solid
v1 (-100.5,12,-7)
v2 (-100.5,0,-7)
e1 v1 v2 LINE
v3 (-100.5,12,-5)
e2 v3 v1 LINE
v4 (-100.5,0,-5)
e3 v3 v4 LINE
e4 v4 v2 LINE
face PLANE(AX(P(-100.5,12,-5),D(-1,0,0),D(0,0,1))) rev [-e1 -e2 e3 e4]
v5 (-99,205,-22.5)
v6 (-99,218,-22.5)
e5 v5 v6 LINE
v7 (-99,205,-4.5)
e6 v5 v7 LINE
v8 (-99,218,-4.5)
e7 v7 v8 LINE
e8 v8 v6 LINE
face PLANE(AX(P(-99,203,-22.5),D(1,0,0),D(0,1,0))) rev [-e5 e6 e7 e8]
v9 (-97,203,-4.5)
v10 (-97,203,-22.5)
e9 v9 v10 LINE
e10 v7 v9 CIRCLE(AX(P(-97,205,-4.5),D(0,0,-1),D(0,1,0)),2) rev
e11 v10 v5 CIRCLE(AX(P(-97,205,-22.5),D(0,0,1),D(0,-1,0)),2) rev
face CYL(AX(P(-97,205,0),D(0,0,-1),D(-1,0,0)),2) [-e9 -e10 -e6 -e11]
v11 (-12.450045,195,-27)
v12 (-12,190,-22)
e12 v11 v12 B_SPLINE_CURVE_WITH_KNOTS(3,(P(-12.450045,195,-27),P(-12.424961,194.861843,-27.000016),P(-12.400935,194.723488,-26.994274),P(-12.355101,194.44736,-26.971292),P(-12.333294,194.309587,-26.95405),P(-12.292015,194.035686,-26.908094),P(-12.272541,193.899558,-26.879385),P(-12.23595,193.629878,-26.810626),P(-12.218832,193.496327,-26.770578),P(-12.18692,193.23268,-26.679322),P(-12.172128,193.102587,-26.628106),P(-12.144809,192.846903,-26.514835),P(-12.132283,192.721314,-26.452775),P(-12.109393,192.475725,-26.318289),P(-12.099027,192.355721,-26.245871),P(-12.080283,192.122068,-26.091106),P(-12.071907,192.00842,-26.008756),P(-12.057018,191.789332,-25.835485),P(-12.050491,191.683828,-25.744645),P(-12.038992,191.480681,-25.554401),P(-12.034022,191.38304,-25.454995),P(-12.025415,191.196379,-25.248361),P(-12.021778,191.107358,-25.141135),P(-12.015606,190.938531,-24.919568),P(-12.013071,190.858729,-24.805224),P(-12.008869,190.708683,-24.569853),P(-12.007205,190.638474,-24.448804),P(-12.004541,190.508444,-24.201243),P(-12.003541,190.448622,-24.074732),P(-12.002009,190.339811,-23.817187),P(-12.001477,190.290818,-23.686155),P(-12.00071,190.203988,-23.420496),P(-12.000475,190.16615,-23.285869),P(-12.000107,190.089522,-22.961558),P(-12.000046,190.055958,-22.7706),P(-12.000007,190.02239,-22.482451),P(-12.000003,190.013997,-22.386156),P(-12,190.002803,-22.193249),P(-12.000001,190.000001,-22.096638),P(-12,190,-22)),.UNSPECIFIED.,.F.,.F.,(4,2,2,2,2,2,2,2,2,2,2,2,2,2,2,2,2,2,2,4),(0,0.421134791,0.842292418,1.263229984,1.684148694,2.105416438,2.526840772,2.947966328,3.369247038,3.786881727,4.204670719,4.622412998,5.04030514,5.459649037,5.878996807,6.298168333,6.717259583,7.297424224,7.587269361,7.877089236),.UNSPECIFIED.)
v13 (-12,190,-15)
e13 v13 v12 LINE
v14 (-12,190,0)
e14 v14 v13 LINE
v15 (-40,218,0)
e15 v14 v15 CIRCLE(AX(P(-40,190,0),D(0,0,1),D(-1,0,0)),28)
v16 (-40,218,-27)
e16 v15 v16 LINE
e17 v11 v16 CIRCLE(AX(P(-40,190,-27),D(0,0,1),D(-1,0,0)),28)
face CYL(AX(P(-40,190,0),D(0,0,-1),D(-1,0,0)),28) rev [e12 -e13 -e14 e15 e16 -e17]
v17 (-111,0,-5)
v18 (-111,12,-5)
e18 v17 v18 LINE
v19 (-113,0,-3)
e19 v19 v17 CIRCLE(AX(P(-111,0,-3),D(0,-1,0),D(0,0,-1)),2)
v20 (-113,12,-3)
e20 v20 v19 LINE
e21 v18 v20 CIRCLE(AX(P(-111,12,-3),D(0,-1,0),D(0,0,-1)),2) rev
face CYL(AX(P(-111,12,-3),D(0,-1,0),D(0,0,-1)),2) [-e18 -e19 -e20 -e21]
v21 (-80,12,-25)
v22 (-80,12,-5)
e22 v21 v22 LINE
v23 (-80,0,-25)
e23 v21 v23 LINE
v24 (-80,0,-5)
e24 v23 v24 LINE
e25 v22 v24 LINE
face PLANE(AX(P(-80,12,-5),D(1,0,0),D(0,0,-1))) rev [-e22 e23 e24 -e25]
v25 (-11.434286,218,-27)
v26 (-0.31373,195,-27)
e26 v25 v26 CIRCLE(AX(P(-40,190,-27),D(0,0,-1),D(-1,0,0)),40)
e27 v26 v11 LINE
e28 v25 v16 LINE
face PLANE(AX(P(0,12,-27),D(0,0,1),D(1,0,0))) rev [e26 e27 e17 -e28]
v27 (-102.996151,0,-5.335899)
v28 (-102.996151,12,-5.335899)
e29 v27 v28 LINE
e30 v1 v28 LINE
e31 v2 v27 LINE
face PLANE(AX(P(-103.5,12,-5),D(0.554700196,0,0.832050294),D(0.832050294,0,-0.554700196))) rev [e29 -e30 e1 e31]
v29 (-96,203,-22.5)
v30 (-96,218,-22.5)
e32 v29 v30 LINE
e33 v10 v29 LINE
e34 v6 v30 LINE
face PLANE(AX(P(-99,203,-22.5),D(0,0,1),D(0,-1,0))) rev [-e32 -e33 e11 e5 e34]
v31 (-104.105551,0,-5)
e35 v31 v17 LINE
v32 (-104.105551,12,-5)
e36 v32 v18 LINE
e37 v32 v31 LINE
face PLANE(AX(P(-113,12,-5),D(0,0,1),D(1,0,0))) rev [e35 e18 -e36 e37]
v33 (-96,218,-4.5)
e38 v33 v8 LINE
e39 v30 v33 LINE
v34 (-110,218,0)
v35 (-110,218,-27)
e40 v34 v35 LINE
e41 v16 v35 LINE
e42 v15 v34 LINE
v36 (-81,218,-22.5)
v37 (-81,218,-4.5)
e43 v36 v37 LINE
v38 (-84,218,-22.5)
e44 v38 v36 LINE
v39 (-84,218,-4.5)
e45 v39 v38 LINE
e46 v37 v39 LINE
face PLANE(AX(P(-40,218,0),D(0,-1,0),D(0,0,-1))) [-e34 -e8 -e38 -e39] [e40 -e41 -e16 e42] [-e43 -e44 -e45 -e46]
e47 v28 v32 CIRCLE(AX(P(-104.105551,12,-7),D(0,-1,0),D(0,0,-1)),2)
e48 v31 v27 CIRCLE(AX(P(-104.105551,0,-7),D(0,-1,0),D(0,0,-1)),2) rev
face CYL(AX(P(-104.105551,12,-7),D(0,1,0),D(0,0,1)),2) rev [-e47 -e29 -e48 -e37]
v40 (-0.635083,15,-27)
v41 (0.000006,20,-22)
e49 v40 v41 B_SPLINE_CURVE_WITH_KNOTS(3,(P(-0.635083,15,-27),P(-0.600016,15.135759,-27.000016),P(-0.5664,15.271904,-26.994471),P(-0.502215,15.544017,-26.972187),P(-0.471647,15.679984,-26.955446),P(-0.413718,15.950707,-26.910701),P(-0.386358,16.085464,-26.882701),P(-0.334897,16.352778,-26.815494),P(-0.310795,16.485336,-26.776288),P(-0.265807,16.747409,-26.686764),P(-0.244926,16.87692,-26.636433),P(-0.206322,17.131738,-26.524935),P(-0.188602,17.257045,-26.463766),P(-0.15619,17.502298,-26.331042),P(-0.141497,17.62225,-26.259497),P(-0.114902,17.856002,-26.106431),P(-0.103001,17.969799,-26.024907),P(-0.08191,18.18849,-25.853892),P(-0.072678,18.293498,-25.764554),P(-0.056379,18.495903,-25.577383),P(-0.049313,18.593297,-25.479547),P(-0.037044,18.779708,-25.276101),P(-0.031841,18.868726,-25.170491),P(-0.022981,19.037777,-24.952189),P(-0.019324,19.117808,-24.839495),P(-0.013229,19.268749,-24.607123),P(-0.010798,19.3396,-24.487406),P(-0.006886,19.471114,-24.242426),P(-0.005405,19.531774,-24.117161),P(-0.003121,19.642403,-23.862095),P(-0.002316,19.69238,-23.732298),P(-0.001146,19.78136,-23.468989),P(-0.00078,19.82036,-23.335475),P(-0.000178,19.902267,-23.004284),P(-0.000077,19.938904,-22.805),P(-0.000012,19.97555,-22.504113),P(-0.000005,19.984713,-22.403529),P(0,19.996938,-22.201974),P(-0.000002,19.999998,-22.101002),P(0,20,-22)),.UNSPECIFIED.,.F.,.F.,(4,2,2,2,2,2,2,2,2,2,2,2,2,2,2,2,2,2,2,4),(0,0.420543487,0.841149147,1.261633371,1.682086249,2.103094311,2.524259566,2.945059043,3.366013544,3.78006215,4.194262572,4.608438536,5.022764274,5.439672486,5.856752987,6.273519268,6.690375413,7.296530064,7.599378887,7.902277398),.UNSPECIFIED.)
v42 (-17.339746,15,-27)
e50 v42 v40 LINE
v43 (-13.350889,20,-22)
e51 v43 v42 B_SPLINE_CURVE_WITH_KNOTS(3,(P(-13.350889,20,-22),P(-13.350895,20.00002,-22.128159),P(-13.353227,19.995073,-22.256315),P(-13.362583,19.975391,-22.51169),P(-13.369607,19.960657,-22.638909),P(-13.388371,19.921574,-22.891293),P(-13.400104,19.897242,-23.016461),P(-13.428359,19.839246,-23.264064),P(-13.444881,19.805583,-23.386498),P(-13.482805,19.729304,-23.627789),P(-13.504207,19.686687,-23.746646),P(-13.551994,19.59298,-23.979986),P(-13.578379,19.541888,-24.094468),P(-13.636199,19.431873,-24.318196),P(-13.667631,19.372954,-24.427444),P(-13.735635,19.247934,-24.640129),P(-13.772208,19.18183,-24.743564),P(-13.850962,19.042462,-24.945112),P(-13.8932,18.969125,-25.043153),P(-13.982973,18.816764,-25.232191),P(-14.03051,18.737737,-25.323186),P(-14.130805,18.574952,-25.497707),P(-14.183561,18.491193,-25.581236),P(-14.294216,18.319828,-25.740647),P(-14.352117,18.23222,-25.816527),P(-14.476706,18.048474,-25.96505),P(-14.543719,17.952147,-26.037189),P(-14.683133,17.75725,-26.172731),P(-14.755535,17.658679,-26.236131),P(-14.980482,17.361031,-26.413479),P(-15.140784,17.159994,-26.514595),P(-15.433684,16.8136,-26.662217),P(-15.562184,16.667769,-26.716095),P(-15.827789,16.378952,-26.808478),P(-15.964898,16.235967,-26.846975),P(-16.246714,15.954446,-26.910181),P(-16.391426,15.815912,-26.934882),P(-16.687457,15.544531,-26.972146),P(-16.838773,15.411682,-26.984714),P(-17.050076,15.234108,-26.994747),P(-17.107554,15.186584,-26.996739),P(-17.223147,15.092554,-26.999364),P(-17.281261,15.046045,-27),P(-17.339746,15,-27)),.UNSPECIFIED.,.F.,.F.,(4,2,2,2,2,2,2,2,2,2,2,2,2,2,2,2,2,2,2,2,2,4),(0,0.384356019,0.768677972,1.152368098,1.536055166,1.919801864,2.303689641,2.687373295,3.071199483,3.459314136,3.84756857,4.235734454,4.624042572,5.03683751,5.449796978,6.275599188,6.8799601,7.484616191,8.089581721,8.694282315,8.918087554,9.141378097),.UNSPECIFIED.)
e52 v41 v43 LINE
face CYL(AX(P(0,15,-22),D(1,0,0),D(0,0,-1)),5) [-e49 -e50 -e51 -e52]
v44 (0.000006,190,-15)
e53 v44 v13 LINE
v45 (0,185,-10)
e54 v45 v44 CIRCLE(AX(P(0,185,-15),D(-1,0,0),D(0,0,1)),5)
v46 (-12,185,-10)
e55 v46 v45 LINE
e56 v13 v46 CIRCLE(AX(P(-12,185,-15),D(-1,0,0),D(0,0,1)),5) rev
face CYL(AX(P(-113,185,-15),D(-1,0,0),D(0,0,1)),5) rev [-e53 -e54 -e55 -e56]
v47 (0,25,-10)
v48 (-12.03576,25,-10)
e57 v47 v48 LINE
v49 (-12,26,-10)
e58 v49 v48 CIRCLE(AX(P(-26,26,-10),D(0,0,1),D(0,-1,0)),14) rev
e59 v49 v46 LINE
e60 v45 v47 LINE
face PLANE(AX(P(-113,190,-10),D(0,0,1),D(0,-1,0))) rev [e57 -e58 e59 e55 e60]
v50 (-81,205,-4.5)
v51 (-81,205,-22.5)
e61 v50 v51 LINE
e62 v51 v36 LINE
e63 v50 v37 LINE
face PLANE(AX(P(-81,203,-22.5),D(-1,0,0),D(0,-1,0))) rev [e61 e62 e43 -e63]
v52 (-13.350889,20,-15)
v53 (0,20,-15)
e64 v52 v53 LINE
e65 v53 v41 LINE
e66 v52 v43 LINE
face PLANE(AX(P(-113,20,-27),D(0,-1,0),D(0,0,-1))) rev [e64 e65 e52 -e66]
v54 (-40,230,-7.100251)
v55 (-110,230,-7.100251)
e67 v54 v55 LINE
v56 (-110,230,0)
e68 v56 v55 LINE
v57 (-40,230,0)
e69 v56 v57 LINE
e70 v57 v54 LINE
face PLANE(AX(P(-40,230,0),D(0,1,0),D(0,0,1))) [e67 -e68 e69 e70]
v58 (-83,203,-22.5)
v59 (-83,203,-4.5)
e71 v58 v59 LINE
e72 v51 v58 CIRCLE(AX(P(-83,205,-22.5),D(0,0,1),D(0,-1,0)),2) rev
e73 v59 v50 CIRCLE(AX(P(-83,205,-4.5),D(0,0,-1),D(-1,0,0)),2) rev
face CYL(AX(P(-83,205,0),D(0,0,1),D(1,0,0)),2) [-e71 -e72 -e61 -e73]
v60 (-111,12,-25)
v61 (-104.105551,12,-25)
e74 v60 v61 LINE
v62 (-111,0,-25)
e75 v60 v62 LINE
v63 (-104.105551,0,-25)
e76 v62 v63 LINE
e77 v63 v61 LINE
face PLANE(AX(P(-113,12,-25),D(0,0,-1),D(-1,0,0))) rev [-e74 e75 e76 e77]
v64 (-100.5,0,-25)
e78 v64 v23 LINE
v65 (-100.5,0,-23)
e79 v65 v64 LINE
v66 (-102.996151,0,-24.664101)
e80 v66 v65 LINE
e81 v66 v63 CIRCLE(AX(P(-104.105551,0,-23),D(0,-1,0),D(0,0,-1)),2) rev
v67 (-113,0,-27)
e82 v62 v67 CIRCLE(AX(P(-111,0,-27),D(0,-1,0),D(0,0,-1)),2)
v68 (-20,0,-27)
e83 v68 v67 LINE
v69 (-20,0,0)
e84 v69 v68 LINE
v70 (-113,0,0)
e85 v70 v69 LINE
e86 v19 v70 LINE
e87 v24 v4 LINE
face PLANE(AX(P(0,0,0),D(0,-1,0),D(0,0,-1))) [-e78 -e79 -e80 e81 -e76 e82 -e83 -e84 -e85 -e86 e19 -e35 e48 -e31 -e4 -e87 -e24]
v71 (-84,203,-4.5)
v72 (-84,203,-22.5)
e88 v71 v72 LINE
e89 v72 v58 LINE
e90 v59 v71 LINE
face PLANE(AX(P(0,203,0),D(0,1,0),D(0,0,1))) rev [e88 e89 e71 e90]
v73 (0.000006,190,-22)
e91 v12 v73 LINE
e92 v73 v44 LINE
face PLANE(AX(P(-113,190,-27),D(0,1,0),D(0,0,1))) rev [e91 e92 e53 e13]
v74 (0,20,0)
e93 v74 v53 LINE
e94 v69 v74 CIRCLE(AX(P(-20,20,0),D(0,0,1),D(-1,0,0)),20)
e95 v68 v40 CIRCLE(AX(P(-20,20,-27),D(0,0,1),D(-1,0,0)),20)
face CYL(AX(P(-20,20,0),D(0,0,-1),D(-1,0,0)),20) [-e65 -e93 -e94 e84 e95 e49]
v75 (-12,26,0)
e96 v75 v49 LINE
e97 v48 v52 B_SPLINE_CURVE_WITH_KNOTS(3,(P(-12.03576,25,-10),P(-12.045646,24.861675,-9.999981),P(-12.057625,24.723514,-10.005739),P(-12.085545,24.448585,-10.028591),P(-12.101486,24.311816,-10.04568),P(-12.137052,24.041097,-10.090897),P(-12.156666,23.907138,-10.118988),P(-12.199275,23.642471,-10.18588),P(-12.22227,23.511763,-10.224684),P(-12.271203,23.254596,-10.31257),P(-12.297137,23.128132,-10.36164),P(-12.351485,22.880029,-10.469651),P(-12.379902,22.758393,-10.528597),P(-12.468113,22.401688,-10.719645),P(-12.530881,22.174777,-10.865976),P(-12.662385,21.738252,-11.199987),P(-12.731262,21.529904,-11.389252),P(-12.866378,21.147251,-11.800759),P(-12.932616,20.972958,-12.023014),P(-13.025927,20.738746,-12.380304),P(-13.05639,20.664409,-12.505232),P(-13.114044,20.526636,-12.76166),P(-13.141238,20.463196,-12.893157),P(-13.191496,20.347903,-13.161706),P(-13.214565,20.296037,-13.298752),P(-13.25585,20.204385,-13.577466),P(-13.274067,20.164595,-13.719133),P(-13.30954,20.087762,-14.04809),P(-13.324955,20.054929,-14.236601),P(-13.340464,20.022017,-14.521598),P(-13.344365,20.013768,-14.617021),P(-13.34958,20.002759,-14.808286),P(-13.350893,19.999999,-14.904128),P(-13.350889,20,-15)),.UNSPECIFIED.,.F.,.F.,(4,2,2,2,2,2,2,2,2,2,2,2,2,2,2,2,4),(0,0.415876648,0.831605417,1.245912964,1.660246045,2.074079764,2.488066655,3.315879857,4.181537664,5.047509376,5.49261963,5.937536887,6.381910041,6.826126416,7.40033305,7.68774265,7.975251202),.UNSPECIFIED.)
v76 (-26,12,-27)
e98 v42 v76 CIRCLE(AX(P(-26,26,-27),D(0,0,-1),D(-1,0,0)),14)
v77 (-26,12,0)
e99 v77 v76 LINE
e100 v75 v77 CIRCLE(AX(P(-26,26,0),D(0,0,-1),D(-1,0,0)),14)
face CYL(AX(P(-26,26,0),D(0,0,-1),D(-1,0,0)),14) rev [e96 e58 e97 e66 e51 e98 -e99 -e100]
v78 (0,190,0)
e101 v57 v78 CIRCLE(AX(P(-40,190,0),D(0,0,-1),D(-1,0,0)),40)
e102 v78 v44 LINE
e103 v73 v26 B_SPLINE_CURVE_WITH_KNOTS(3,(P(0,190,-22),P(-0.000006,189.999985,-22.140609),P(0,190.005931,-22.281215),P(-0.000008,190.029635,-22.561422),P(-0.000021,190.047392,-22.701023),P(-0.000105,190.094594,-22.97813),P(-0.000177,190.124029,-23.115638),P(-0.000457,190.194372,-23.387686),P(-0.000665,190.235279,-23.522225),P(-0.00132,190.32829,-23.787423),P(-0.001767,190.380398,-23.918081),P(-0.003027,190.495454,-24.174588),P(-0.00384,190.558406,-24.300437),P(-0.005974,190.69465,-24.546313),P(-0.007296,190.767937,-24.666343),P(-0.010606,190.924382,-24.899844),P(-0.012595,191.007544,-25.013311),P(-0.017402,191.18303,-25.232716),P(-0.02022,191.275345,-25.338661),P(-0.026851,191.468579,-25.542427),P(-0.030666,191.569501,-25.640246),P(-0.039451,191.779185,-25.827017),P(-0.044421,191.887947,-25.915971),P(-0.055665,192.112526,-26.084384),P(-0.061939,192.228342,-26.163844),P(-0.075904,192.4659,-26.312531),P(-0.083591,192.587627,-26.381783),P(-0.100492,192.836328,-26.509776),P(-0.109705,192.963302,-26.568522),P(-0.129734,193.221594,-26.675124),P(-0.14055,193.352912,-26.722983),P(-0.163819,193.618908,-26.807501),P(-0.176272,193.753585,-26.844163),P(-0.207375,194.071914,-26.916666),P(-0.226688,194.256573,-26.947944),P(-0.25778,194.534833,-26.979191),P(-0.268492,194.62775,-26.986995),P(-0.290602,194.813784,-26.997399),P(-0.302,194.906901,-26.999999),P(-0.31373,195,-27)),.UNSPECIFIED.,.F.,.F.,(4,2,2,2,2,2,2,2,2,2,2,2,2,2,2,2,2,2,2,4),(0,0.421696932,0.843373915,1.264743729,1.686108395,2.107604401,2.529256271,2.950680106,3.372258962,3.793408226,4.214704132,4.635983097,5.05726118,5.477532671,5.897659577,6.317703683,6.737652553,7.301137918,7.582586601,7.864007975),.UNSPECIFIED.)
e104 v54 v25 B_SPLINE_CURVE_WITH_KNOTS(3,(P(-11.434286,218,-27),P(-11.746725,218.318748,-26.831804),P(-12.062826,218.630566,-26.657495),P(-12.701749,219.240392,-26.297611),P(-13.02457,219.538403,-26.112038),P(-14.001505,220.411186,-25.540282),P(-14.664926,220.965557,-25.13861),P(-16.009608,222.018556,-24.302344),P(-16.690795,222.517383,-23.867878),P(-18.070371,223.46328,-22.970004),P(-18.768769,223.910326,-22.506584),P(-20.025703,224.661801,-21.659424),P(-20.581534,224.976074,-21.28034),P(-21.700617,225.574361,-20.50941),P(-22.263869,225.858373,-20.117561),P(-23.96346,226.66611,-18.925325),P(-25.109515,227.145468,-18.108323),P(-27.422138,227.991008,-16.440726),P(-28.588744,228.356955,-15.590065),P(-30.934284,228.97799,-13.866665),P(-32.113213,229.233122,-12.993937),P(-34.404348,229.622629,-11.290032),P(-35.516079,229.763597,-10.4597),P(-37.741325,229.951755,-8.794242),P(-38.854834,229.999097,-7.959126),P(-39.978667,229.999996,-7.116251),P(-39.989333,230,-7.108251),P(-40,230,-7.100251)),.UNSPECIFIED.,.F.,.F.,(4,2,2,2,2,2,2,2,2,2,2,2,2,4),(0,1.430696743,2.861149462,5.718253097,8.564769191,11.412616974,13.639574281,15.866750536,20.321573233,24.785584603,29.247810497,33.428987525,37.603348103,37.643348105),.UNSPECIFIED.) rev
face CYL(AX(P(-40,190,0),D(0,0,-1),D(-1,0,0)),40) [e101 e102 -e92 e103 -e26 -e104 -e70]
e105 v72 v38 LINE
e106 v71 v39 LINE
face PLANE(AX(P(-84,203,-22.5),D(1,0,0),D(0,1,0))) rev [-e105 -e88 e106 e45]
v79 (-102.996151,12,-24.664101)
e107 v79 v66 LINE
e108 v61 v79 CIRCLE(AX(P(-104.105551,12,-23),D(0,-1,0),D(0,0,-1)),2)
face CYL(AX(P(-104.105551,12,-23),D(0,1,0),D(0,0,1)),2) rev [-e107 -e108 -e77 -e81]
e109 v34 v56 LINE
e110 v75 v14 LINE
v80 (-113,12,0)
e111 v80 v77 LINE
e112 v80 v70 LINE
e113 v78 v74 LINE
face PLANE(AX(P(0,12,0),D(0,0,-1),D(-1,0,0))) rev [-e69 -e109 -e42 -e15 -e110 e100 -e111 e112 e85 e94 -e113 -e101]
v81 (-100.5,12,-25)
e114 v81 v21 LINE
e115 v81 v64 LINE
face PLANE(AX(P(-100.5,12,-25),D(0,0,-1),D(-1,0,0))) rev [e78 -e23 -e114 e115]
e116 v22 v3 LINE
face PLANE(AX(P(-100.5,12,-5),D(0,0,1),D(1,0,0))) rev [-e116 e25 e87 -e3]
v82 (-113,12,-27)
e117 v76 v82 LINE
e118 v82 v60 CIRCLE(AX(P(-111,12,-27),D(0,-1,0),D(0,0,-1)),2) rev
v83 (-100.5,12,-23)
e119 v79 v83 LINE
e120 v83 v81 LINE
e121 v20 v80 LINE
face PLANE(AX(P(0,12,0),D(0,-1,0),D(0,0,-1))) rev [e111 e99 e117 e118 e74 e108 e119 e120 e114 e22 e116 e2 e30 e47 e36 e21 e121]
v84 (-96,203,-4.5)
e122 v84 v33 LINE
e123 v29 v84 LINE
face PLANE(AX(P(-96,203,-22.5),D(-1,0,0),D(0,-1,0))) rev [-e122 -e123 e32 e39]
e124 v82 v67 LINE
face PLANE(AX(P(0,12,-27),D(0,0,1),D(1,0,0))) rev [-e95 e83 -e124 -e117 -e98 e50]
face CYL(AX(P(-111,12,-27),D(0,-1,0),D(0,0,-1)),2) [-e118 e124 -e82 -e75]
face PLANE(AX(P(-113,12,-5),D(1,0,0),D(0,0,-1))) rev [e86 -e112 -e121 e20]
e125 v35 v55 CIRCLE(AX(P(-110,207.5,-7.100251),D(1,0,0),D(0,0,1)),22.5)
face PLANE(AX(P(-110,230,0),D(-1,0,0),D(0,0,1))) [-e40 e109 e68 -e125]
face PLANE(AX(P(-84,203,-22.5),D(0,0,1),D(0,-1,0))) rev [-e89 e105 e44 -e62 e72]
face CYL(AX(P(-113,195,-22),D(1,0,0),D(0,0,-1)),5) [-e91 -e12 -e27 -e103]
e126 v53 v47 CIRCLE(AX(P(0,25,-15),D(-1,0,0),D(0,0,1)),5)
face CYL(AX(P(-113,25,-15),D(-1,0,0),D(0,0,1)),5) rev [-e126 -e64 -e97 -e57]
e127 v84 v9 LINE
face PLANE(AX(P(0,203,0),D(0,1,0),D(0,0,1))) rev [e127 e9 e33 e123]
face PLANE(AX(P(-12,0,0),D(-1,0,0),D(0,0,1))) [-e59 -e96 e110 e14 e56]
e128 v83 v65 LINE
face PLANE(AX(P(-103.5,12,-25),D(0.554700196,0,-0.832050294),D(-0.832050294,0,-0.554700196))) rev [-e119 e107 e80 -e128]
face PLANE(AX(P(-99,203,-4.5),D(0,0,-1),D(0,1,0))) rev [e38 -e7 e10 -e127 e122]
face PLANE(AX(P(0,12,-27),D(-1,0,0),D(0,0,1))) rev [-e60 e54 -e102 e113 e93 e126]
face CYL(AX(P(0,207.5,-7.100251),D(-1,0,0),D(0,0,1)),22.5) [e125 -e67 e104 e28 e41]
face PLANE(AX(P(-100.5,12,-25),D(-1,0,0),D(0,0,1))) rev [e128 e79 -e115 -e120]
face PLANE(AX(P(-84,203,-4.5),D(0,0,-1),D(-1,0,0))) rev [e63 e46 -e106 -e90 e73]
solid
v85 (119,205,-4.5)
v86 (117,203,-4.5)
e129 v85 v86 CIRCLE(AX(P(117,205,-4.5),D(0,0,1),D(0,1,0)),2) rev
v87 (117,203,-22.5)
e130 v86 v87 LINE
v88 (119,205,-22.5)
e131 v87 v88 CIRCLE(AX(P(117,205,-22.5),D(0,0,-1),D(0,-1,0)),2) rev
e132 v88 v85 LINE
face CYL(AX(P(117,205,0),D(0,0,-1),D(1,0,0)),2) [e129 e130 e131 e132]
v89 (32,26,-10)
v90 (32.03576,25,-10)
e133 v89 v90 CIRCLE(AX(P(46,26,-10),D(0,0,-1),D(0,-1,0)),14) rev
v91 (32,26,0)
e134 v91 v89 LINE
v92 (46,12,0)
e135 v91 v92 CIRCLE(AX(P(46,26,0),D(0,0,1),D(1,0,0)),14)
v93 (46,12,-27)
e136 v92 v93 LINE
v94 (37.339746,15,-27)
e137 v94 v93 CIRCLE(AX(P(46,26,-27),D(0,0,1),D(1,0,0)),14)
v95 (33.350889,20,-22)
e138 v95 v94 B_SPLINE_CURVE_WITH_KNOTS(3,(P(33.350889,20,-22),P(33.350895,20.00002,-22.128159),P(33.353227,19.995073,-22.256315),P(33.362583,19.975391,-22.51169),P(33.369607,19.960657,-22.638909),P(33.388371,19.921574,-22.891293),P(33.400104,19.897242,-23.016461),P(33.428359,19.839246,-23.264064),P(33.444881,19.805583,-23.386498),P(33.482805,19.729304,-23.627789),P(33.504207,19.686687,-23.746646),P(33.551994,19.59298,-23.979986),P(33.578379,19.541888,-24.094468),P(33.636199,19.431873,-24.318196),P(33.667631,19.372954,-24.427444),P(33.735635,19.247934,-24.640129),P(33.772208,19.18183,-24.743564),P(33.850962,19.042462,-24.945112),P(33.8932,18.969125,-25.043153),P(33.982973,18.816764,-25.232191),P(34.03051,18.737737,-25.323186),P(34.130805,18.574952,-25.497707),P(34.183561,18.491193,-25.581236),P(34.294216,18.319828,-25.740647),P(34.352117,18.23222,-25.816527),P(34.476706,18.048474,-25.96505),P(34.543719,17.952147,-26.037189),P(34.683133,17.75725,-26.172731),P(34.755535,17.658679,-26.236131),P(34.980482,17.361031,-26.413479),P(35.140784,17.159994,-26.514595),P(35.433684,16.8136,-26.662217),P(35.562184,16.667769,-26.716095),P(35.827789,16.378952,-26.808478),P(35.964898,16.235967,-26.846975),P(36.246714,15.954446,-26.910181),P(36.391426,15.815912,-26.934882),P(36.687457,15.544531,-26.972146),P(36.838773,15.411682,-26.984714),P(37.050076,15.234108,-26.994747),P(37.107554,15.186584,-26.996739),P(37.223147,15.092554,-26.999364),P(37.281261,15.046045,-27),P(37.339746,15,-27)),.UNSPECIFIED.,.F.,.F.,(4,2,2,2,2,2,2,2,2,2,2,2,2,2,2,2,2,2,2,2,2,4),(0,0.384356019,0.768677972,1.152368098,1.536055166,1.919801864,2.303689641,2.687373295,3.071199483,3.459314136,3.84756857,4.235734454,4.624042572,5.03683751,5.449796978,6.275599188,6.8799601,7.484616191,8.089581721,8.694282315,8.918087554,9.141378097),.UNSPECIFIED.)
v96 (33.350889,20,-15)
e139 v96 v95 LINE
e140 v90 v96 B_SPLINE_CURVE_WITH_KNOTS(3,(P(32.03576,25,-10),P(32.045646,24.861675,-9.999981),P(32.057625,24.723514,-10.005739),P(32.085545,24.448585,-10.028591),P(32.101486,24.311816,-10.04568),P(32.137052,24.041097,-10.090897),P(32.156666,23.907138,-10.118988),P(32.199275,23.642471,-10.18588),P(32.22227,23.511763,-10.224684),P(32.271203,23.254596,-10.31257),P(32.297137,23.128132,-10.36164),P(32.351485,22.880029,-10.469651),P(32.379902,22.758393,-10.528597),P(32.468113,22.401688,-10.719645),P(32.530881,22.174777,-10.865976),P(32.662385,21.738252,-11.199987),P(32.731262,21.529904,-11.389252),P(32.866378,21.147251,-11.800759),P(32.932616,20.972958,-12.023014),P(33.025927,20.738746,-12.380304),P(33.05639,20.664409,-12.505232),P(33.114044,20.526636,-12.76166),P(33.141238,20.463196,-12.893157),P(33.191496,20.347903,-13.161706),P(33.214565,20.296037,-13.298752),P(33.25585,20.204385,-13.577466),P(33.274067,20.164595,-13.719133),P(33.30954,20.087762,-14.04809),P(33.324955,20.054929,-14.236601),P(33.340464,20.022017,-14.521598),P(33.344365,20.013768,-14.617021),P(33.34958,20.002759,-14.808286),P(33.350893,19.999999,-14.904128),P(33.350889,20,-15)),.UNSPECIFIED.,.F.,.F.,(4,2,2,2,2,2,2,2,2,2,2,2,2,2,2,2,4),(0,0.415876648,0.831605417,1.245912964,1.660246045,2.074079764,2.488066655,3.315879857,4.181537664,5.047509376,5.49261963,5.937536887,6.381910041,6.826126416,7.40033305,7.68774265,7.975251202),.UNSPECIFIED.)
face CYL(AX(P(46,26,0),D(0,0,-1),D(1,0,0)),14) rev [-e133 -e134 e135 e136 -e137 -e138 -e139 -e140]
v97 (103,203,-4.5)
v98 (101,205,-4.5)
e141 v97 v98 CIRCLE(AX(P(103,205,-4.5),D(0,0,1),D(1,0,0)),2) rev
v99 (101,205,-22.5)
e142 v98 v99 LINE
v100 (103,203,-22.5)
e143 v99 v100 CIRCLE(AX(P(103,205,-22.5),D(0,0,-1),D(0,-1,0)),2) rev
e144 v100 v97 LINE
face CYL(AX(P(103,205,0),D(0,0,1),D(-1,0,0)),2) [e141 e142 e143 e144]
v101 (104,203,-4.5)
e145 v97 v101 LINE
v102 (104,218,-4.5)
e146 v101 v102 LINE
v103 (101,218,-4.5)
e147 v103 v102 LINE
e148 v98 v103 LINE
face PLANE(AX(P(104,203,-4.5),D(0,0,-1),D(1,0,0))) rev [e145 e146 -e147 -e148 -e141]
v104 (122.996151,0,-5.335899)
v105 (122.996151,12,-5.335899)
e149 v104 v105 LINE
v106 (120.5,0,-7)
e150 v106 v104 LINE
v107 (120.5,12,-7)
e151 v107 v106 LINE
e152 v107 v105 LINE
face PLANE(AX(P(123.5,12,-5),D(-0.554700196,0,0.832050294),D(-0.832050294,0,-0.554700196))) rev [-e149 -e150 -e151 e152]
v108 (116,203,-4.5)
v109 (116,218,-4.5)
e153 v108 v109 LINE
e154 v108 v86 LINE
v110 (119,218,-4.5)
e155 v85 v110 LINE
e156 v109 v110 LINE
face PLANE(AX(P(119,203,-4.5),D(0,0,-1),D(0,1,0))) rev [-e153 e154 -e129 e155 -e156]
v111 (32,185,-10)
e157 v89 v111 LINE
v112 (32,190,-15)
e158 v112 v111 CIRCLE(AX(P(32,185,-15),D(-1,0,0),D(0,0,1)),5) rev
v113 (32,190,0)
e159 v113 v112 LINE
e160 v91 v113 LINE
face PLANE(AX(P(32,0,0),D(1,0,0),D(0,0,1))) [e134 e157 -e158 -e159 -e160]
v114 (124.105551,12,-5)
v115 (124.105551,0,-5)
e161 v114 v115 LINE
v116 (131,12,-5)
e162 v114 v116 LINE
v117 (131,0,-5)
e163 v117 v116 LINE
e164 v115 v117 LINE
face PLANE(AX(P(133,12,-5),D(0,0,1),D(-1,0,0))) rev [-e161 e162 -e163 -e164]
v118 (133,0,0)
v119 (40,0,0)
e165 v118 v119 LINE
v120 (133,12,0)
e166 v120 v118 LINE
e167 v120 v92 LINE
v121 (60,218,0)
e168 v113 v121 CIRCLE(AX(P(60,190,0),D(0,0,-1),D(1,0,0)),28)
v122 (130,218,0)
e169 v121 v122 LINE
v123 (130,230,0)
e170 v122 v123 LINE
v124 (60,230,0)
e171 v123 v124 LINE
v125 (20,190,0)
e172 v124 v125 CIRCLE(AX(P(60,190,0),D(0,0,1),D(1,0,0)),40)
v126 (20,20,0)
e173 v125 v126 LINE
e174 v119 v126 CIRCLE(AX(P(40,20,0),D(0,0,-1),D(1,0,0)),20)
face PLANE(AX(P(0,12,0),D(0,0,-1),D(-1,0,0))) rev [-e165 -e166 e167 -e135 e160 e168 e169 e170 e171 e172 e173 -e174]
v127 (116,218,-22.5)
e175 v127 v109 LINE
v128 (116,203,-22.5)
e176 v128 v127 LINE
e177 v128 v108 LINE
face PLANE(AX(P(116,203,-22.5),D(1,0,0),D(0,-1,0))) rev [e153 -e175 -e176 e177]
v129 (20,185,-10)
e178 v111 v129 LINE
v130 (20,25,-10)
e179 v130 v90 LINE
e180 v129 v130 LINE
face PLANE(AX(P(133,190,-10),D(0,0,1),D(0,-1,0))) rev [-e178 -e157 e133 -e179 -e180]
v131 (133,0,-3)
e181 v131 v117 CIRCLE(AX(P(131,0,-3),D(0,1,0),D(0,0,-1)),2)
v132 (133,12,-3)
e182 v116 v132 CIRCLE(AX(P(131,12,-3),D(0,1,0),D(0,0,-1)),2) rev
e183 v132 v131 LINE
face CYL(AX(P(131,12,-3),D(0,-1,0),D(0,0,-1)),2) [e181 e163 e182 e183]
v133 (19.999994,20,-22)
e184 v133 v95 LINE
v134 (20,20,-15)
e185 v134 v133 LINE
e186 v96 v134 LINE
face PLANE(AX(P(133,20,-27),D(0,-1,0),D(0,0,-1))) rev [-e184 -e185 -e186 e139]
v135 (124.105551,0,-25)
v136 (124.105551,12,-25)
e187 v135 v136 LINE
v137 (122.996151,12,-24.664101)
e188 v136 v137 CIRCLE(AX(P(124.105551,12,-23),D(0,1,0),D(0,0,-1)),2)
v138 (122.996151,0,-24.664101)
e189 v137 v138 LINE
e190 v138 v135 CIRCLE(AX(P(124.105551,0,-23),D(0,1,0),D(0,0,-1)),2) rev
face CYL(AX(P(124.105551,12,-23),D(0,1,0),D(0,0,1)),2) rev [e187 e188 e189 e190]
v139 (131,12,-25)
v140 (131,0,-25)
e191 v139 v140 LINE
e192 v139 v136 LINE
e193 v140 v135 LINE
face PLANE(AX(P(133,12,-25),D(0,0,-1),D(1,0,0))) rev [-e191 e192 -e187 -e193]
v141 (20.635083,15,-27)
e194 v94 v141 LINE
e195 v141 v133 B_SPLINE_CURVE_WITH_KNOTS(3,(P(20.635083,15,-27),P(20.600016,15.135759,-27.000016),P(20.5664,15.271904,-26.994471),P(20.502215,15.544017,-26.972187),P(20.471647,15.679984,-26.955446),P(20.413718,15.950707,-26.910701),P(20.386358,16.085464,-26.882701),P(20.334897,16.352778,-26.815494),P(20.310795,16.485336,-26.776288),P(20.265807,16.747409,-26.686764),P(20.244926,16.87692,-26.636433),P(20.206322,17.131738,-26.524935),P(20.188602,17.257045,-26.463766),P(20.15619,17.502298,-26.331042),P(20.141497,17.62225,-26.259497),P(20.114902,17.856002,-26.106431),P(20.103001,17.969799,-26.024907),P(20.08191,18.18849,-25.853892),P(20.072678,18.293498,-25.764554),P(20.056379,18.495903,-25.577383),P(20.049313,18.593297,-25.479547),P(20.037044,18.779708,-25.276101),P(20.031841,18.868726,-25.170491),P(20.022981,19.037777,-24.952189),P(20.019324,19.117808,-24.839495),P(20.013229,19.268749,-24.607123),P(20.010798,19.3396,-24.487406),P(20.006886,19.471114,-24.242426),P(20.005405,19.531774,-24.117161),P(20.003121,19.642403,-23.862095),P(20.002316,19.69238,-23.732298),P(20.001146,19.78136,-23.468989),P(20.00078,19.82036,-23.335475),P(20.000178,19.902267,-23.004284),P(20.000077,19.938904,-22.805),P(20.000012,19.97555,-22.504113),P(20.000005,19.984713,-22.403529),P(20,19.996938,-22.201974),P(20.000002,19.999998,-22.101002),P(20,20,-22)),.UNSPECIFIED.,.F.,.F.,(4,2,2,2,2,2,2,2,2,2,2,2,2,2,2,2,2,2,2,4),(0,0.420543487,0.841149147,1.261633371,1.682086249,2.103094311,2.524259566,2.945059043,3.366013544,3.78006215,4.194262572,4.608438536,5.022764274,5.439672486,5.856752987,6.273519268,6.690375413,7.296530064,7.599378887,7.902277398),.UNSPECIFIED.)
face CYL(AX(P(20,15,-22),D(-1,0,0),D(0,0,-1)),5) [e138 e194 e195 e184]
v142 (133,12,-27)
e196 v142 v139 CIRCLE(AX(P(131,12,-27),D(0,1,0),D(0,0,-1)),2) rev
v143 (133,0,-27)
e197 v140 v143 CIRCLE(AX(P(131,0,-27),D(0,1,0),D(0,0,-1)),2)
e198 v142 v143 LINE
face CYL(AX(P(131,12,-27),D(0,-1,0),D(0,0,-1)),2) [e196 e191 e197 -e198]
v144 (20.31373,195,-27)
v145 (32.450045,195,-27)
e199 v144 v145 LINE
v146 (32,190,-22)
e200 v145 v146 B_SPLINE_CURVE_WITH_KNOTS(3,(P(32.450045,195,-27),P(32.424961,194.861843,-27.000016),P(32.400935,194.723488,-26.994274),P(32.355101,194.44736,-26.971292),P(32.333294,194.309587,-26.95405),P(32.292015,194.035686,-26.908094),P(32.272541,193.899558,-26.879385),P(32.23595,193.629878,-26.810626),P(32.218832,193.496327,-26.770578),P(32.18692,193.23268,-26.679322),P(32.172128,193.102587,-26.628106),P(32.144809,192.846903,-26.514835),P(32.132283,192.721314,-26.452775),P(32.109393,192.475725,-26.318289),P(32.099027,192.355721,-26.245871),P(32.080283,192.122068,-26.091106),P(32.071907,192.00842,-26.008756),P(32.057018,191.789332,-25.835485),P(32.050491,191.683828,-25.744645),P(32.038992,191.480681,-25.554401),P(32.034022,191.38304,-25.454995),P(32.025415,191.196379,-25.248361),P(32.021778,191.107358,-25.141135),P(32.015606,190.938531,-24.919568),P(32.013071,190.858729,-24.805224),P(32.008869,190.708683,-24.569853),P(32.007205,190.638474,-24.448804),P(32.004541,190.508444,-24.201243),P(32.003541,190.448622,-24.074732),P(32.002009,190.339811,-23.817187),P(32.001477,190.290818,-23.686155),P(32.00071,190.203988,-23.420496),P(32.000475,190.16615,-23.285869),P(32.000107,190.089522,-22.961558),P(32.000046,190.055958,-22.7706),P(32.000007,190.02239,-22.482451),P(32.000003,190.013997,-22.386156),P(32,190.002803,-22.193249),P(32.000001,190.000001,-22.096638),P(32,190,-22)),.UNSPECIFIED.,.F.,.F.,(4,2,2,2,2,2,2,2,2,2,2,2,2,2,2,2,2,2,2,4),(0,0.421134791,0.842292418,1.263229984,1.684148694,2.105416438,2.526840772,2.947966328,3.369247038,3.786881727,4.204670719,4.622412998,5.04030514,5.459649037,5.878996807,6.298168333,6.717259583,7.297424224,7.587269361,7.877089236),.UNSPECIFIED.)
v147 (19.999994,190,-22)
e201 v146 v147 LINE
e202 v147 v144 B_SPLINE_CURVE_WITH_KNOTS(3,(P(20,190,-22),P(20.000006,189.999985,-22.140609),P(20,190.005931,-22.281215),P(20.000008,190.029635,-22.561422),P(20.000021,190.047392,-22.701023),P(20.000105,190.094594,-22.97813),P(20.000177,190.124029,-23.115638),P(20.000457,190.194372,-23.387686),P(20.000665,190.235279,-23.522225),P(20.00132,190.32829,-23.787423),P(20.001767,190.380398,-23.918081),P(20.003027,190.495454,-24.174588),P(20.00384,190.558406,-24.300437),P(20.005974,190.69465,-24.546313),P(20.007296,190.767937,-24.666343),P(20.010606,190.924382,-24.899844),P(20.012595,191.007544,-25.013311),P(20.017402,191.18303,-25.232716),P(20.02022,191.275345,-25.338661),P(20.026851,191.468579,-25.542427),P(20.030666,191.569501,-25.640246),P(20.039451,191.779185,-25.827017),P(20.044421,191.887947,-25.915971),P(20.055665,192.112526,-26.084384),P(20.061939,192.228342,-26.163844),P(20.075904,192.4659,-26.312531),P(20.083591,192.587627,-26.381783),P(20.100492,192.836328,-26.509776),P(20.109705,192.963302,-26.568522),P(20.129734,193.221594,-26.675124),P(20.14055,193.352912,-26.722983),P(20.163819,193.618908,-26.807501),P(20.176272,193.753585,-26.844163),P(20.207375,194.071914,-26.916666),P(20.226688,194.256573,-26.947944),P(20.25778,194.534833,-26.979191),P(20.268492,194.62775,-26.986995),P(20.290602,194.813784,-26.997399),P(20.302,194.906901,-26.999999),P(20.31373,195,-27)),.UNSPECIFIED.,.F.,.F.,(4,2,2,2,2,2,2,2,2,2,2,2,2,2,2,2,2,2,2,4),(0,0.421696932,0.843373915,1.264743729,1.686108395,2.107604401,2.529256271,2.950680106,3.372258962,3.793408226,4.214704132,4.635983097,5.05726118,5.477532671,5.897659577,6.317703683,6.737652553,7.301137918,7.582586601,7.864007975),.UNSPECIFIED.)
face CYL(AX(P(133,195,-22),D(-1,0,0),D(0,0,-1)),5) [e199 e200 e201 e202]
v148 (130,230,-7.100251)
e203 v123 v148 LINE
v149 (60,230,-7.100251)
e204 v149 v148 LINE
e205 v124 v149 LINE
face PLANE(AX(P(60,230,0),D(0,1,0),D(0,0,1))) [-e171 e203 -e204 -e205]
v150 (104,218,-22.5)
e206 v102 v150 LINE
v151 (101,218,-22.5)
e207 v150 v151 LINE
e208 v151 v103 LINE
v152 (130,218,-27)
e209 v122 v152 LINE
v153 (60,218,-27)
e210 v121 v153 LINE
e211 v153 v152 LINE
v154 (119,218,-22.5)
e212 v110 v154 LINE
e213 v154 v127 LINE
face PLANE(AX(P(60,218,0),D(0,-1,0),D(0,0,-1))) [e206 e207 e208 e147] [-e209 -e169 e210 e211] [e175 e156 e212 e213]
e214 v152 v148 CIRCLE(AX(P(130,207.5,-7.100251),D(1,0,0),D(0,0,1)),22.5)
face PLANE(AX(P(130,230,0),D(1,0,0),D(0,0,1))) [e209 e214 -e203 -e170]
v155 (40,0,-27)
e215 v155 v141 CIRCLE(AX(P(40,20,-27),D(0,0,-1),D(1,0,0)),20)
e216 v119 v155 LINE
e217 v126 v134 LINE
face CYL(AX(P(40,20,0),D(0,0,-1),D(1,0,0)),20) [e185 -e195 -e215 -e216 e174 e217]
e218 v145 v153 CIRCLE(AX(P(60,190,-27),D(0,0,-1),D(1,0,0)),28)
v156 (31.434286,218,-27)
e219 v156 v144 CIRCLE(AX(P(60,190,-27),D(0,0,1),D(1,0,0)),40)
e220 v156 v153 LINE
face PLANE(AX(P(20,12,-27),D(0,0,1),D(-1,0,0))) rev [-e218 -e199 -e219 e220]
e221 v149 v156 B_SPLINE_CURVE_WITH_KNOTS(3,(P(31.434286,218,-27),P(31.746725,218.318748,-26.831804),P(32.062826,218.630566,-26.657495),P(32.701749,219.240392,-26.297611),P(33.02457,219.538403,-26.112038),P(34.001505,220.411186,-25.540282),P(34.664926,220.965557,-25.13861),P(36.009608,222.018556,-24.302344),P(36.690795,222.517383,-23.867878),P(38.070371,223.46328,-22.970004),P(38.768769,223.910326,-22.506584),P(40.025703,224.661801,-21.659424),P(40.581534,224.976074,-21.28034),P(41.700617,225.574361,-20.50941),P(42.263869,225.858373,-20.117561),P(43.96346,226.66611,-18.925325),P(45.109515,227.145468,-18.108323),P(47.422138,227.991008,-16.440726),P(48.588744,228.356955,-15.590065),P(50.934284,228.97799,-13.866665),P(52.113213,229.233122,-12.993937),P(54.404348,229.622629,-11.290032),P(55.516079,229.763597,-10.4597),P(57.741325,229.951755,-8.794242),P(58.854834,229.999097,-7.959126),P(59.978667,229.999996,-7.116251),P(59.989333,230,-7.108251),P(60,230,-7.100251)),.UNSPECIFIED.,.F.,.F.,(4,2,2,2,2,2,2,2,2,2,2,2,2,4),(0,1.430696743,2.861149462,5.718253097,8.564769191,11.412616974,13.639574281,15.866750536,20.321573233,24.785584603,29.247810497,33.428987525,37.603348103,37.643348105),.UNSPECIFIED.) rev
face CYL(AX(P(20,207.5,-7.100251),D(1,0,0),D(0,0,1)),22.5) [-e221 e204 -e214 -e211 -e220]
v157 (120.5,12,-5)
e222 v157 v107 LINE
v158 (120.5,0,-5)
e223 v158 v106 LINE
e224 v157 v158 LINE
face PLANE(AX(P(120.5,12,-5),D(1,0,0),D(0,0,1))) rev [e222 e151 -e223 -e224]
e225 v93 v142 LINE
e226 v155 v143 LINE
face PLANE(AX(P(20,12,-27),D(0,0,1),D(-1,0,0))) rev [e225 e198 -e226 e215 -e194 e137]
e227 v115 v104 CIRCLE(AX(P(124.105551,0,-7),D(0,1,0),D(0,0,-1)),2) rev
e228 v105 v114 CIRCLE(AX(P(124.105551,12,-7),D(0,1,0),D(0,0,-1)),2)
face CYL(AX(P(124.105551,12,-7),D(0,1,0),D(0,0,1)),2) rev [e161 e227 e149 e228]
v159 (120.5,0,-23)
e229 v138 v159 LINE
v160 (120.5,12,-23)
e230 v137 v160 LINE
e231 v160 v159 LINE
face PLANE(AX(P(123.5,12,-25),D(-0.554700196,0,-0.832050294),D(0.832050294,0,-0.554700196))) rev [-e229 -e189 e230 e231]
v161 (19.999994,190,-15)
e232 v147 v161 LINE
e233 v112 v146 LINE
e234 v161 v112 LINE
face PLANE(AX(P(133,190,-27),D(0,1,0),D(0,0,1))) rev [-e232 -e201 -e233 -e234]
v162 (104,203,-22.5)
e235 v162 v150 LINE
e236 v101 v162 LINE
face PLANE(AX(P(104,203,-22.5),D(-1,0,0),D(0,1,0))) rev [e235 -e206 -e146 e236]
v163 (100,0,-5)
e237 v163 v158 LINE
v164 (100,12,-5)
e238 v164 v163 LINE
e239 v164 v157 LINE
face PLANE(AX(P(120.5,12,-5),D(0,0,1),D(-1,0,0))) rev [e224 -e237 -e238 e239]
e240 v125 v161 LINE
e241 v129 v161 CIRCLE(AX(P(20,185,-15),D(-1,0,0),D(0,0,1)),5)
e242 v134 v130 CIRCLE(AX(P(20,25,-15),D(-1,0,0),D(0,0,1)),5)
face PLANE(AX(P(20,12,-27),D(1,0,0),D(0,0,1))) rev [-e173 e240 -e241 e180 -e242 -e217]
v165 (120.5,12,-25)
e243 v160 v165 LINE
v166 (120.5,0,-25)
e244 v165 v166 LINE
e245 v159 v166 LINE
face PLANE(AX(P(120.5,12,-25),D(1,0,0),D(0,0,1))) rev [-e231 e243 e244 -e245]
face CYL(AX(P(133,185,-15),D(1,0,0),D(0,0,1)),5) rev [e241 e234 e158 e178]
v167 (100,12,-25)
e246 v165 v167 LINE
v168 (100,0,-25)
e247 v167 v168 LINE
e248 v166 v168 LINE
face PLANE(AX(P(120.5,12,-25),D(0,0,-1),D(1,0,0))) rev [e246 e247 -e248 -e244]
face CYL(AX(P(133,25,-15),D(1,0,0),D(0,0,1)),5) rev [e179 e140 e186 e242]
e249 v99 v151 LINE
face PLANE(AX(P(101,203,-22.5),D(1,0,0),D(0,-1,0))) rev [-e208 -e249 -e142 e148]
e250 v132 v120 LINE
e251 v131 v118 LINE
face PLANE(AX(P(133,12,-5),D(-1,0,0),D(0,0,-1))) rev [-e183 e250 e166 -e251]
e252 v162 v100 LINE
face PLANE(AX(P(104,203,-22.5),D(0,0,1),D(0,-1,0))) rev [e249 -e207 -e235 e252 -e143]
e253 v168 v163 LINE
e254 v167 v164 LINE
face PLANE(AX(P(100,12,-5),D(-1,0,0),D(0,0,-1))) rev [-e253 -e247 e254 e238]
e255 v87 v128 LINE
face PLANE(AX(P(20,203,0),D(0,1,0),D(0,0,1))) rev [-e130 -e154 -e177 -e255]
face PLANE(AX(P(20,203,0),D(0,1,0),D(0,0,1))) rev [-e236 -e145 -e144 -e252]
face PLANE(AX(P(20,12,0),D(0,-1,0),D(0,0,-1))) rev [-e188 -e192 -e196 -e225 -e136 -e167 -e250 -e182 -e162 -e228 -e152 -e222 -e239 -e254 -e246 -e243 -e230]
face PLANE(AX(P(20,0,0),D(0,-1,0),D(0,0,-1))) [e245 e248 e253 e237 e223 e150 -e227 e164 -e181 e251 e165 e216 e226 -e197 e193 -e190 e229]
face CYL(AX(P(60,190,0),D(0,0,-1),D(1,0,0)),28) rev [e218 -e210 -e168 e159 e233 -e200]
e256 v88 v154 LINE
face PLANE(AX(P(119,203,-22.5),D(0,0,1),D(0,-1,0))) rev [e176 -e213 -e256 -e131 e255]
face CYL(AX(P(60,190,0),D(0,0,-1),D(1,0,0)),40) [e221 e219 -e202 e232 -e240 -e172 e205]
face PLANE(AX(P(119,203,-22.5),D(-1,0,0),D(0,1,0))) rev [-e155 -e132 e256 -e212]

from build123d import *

# Parameters (mm, degrees)
EXTRUDE_1_DEPTH          = 12
EXTRUDE_2_DEPTH          = 27
SKETCH_6_W               = 3
SKETCH_6_H               = 18
EXTRUDE_3_DEPTH          = 15
EXTRUDE_4_DEPTH          = 27
CUT_EXTRUDE_4_DEPTH      = 258.678093753
CUT_EXTRUDE_5_DEPTH      = 257.376676006
FILLET_1_R               = 2
CUT_EXTRUDE_6_DEPTH      = 258.678093852
CUT_EXTRUDE_6_DEPTH_BACK = 258.678093852
SKETCH_10_W              = 17
SKETCH_10_H              = 170
FILLET_3_R               = 5
FILLET_4_R               = 2
SKETCH_11_W              = 17.589791481
SKETCH_11_H              = 30.84175393
EXTRUDE_5_DEPTH          = 10
CUT_EXTRUDE_7_REACH      = 268.268
SKETCH_12_W              = 20
SKETCH_12_H              = 30.84175393


with BuildPart() as part:
    # 草图1 → 凸台-拉伸1 (new body)
    with BuildSketch(Plane(origin=(0, 0, 0), x_dir=(1, 0, 0), z_dir=(0, 1, 0))):
        Polygon((-113, 5), (-113, 0), (0, 0), (0, 27), (-113, 27), (-113, 25), (-103.5, 25), (-100.5, 23), (-100.5, 25), (-80, 25), (-80, 5), (-100.5, 5), (-100.5, 7), (-103.5, 5), align=None)
    extrude(amount=EXTRUDE_1_DEPTH)

    # 草图5 → 凸台-拉伸2 (add)
    with BuildSketch(Plane(origin=(0, 0, -27), x_dir=(-1, 0, 0), z_dir=(0, 0, -1))):
        with BuildLine():
            Line((0, 0), (12, 0))
            Line((12, 0), (12, 190))
            ThreePointArc((12, 190), (20.201010127, 209.798989873), (40, 218))
            Line((40, 218), (110, 218))
            Line((110, 218), (110, 230))
            Line((110, 230), (40, 230))
            ThreePointArc((40, 230), (11.715728753, 218.284271247), (0, 190))
            Line((0, 190), (0, 0))
        make_face()
    extrude(amount=-EXTRUDE_2_DEPTH)

    # 草图6 → 凸台-拉伸3 (add)
    with BuildSketch(Plane.XZ.offset(-218)):
        with Locations((-97.5, -13.5)):
            Rectangle(SKETCH_6_W, SKETCH_6_H)
        with Locations((-82.5, -13.5)):
            Rectangle(SKETCH_6_W, SKETCH_6_H)
    extrude(amount=EXTRUDE_3_DEPTH)

    # 草图7 → 凸台-拉伸4 (add)
    with BuildSketch(Plane(origin=(0, 0, -27), x_dir=(-1, 0, 0), z_dir=(0, 0, -1))):
        with BuildLine():
            Line((26, 12), (12, 12))
            Line((12, 12), (12, 26))
            ThreePointArc((12, 26), (16.100505063, 16.100505063), (26, 12))
        make_face()
    extrude(amount=-EXTRUDE_4_DEPTH)

    # 草图8 → 切除-拉伸4 (cut, through all)
    with BuildSketch(Plane(origin=(0, 0, -27), x_dir=(-1, 0, 0), z_dir=(0, 0, -1))):
        with BuildLine():
            Line((0, 20), (0, 0))
            Line((0, 0), (20, 0))
            ThreePointArc((20, 0), (5.857864376, 5.857864376), (0, 20))
        make_face()
    extrude(amount=-CUT_EXTRUDE_4_DEPTH, mode=Mode.SUBTRACT)

    # 草图9 → 切除-拉伸5 (cut, through all)
    with BuildSketch(Plane.ZY.offset(110)):
        with BuildLine():
            Line((-27, 230), (-27, 218))
            ThreePointArc((-27, 218), (-18.719201296, 226.767848868), (-7.100251258, 230))
            Line((-7.100251258, 230), (-27, 230))
        make_face()
    extrude(amount=-CUT_EXTRUDE_5_DEPTH, mode=Mode.SUBTRACT)

    # 圆角1
    fillet_1_edges = [part.edges().sort_by_distance(p)[0] for p in [
        (-99, 203, -13.5),
        (-81, 203, -13.5),
    ]]
    fillet(fillet_1_edges, radius=FILLET_1_R)

    # 草图10 → 切除-拉伸6 (cut, two sides: drawn at the far end of the back side and taken through both)
    with BuildSketch(Plane(origin=(0, 0, 0), x_dir=(0, 0, -1), z_dir=(1, 0, 0)).offset(-CUT_EXTRUDE_6_DEPTH_BACK)):
        with Locations((18.5, 105)):
            Rectangle(SKETCH_10_W, SKETCH_10_H)
    extrude(amount=CUT_EXTRUDE_6_DEPTH + CUT_EXTRUDE_6_DEPTH_BACK, mode=Mode.SUBTRACT)

    # 圆角3
    fillet_3_edges = [part.edges().sort_by_distance(p)[0] for p in [
        (-6.67544468, 20, -27),
        (-6, 190, -27),
        (-6.67544468, 20, -10),
        (-6, 190, -10),
    ]]
    fillet(fillet_3_edges, radius=FILLET_3_R)

    # 圆角4
    fillet_4_edges = [part.edges().sort_by_distance(p)[0] for p in [
        (-113, 6, -5),
        (-103.5, 6, -5),
        (-103.5, 6, -25),
        (-113, 6, -25),
    ]]
    fillet(fillet_4_edges, radius=FILLET_4_R - 0.0001)  # a hair under: the kernel refuses the full size

    # 草图11 → 凸台-拉伸5 (add)
    with BuildSketch(Plane(origin=(10, 0, 0), x_dir=(0, 0, -1), z_dir=(1, 0, 0))):
        with Locations((8.794895741, 105.194403444)):
            Rectangle(SKETCH_11_W, SKETCH_11_H)
    extrude(amount=-EXTRUDE_5_DEPTH)

    # 镜向8: part across plane


with BuildPart() as part_1:
    add(part.part)
    add(part.part.mirror(Plane(origin=(10, 0, 0), x_dir=(0, 0, 1), z_dir=(1, 0, 0))))

    # 草图12 → 切除-拉伸7 (cut, up to next)
    with BuildSketch(Plane(origin=(0, 0, -17.589791481), x_dir=(-1, 0, 0), z_dir=(0, 0, -1)), mode=Mode.PRIVATE) as cut_extrude_7_sk1:
        with Locations((-10, 105.194403444)):
            Rectangle(SKETCH_12_W, SKETCH_12_H)
    cut_extrude_7_tool1 = extrude(cut_extrude_7_sk1.sketch, amount=-CUT_EXTRUDE_7_REACH, mode=Mode.PRIVATE) & part_1.part
    add(cut_extrude_7_tool1.solids().sort_by_distance((10, 105.194403, -17.589791))[0], mode=Mode.SUBTRACT)


with BuildPart() as cut_extrude_7_piece_1:
    # of the separate pieces the step leaves, piece 1, a body of its own (cut_extrude_7_pieces)
    add(part_1.part.solids().sort_by_distance((-102.996176075, 12, -5.335882616))[0])


with BuildPart() as cut_extrude_7_piece_2:
    # of the separate pieces the step leaves, piece 2, a body of its own (cut_extrude_7_pieces)
    add(part_1.part.solids().sort_by_distance((20, 20, 0))[0])


solid = Compound([cut_extrude_7_piece_1.part, cut_extrude_7_piece_2.part])
